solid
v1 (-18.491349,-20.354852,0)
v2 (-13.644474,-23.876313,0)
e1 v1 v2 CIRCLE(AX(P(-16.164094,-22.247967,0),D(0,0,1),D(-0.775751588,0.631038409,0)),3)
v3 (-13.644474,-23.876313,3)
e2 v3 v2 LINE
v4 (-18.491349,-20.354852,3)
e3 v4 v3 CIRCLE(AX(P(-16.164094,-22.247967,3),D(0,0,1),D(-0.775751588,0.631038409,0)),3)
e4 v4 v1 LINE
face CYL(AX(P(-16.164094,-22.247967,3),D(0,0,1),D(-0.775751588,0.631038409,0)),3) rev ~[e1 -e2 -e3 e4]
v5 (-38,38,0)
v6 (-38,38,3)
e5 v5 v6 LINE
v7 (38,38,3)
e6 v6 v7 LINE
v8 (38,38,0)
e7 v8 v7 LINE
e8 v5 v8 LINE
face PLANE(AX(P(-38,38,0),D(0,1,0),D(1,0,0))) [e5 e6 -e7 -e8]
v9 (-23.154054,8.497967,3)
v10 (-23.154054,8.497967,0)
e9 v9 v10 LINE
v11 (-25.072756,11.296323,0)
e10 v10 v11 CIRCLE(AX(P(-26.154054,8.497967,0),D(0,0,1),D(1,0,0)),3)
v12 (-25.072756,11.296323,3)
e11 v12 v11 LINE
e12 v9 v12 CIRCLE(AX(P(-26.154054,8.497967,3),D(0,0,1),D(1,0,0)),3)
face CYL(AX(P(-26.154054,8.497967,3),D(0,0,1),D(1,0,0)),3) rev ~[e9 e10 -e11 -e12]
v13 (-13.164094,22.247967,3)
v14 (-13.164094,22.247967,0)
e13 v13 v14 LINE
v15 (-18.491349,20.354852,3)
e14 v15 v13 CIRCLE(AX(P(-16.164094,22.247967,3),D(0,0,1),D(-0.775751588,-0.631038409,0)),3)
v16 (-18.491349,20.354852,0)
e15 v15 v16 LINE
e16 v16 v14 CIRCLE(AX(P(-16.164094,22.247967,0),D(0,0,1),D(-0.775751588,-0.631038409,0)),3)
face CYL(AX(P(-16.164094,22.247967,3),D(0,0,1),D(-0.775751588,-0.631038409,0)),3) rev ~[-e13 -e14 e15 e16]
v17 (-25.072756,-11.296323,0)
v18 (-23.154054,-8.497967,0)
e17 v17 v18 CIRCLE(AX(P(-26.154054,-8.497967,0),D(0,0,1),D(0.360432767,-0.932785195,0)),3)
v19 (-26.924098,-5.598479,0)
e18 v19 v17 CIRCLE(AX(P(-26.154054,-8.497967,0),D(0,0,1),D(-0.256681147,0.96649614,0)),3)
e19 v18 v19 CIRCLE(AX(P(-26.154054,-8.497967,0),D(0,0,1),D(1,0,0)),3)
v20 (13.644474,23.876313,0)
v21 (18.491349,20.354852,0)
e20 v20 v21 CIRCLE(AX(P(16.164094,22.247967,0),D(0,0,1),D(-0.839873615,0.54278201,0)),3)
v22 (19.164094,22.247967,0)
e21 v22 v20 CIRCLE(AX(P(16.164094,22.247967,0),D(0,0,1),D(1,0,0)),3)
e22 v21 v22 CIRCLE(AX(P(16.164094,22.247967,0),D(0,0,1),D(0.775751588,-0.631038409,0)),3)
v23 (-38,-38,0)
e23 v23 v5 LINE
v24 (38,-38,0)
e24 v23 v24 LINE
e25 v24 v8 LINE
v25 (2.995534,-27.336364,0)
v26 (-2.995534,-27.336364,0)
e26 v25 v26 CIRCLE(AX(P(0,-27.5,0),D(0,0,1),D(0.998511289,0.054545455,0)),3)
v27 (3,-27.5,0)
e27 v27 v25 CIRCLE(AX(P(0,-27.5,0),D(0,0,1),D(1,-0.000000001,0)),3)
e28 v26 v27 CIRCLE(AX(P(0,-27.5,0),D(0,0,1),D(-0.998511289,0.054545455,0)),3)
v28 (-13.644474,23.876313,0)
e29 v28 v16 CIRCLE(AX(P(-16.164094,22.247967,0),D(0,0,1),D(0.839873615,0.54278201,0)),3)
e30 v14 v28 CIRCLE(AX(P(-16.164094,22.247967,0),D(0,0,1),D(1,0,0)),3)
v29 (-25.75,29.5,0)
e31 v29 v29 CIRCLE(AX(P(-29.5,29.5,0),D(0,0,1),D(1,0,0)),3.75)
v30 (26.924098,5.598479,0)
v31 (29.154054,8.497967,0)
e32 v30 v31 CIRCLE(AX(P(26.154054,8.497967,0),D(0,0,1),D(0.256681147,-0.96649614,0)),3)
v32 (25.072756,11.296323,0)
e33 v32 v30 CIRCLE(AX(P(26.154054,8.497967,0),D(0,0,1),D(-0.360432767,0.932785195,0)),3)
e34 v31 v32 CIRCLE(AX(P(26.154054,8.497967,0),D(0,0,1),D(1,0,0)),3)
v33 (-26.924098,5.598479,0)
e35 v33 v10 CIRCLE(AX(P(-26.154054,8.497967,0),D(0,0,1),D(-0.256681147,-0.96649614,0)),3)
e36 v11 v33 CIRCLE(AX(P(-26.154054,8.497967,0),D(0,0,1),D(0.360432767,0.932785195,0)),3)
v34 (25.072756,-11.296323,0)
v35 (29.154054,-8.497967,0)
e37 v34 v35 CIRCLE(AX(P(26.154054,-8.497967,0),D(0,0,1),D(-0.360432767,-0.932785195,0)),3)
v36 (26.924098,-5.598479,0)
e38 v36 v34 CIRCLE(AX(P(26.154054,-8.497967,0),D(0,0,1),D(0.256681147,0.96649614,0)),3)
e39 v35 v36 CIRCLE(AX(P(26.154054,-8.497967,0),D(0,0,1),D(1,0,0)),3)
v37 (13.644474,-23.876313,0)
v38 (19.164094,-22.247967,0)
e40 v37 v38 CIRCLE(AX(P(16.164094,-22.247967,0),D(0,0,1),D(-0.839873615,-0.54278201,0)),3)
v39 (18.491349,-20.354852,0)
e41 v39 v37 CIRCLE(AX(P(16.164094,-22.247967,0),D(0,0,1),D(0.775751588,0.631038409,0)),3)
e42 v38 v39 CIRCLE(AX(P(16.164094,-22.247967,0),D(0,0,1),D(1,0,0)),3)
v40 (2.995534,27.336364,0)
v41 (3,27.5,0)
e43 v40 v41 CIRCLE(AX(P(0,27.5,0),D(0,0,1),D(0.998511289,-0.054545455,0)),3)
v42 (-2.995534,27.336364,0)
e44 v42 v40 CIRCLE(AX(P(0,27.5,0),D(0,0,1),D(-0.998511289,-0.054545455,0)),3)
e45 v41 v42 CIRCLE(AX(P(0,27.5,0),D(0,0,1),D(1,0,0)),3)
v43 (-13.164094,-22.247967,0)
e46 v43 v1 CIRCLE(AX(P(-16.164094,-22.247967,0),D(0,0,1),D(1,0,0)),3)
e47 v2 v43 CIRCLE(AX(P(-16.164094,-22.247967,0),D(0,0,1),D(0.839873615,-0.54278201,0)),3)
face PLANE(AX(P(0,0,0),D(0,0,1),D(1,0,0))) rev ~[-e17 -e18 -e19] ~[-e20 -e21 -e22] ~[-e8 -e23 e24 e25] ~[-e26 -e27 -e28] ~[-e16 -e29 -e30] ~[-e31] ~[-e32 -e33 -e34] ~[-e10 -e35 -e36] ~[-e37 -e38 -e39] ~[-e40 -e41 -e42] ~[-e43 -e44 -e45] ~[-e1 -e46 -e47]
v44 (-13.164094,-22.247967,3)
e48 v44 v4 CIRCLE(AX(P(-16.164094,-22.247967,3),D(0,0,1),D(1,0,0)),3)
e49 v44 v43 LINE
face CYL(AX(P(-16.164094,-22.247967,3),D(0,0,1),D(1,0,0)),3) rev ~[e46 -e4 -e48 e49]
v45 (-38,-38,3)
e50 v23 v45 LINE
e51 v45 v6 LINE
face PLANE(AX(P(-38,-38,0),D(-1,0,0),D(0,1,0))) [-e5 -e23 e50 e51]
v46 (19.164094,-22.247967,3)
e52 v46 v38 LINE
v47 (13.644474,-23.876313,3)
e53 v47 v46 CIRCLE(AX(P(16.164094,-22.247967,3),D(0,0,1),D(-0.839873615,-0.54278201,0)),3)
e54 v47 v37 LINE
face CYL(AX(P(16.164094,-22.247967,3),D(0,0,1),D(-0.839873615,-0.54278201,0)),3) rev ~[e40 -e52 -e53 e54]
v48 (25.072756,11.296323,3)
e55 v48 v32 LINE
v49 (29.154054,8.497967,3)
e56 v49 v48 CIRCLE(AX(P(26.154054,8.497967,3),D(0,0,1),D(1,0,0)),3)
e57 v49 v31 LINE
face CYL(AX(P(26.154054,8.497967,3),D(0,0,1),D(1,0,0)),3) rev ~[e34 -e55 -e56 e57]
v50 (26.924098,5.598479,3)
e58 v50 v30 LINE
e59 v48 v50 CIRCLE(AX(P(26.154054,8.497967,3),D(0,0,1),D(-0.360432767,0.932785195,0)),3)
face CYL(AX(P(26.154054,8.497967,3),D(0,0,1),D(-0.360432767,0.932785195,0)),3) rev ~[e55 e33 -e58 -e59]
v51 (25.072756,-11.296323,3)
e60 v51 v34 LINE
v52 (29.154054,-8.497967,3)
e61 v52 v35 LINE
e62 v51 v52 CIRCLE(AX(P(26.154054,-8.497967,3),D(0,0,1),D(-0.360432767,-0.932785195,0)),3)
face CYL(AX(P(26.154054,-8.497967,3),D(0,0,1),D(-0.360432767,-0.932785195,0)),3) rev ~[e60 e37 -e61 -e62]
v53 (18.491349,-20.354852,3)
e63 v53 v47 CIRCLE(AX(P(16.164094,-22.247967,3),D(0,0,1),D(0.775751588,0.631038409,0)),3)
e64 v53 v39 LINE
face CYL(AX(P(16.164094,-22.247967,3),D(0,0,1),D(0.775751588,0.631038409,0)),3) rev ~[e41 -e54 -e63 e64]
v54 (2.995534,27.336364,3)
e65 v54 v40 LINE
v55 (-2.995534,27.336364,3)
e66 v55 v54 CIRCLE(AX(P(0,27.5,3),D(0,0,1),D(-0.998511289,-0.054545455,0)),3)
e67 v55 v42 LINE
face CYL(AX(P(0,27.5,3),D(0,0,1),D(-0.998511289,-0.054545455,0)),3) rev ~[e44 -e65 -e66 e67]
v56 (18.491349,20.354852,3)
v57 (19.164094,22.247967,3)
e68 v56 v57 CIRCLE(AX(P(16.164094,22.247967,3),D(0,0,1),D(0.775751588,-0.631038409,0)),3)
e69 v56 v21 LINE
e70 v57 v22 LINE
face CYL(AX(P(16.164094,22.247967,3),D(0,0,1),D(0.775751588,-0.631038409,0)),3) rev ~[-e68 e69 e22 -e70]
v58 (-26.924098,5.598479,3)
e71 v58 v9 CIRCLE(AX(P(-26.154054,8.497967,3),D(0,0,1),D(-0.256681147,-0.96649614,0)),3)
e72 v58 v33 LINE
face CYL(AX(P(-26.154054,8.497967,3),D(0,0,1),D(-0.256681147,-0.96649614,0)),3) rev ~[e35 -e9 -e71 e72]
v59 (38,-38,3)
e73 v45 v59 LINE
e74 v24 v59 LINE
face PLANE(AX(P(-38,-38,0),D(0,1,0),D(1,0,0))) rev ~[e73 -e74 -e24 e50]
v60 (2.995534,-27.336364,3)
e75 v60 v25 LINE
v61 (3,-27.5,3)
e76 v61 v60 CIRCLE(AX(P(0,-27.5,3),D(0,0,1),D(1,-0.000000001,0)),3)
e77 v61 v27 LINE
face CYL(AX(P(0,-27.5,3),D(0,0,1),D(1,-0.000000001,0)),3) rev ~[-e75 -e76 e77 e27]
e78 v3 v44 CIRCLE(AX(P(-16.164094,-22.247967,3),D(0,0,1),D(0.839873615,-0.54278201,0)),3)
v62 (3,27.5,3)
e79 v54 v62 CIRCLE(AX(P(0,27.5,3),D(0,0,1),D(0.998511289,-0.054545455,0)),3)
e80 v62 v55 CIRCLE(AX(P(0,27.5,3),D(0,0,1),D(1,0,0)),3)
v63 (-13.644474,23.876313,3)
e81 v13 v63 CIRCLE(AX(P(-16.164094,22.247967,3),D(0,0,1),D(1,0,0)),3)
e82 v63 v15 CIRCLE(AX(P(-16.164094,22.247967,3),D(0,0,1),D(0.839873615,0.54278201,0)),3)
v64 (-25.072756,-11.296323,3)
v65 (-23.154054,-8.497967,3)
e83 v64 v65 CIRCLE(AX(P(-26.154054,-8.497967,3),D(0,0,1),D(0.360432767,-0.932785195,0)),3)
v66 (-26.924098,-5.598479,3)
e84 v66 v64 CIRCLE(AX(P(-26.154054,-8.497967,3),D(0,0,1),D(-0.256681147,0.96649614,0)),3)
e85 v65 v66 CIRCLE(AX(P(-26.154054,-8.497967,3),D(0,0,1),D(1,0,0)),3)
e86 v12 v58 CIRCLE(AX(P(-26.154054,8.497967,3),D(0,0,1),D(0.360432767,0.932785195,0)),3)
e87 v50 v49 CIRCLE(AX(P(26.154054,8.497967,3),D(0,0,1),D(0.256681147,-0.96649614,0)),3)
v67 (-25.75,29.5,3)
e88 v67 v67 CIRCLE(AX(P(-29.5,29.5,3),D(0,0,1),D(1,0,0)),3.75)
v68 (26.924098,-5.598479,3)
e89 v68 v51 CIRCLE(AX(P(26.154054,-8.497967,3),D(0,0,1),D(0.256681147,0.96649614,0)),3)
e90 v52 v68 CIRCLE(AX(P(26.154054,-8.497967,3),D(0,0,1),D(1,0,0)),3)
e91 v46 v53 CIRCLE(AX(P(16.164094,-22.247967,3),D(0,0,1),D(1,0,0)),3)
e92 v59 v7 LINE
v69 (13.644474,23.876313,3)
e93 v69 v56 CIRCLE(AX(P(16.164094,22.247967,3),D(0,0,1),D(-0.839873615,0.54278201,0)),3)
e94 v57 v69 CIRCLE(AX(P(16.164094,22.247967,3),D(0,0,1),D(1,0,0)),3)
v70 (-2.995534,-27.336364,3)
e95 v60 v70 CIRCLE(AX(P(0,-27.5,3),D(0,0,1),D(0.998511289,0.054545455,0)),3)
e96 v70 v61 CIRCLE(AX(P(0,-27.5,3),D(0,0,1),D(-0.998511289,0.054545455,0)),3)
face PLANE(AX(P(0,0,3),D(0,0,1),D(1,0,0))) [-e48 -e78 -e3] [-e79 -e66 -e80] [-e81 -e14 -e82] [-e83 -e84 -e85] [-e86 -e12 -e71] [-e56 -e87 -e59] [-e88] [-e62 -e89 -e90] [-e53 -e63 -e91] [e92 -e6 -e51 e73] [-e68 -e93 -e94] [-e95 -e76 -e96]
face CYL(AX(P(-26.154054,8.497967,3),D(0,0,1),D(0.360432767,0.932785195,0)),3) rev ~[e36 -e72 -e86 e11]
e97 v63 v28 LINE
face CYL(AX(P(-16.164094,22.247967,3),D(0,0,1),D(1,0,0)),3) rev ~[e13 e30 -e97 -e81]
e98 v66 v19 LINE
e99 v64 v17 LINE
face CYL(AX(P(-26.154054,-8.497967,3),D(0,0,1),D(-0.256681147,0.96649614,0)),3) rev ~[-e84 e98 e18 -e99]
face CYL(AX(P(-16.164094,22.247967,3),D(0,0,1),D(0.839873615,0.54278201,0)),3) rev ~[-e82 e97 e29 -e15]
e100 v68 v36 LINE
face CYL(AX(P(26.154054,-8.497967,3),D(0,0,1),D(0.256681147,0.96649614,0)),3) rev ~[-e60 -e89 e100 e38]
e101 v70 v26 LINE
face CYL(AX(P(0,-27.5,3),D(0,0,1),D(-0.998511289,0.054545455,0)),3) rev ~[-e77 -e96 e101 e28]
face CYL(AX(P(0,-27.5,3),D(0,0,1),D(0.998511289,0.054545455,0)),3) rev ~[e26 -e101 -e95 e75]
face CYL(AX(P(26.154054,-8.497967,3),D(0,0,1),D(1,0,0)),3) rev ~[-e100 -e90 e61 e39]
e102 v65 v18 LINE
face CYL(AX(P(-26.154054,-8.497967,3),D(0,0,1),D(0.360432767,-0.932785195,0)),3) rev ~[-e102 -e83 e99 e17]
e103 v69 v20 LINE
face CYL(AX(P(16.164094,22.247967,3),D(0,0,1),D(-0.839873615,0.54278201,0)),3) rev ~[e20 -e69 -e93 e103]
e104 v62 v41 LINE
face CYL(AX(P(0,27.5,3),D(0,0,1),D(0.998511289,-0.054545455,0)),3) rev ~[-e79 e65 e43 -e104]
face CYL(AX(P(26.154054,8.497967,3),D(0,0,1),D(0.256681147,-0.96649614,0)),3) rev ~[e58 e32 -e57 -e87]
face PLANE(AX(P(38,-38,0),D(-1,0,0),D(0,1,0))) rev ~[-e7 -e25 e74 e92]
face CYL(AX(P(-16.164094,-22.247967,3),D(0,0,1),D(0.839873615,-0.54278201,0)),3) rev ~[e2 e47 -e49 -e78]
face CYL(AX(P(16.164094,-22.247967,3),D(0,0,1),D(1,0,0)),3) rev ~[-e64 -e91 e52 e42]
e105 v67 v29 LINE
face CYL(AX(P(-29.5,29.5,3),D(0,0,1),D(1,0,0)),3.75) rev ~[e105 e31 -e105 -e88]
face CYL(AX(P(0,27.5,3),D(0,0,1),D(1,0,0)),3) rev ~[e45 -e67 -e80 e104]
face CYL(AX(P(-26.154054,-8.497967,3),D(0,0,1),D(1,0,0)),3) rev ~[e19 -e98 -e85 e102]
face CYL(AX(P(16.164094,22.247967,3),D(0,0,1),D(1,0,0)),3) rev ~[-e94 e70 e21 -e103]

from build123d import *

# Parameters (mm, degrees)
F0_W     = 76
F0_H     = 76
F1_DEPTH = 3
F3_DEPTH = 25
F4_R     = 3.75
F5_DEPTH = 25


with BuildPart() as f1:
    # F0 (on Top) → F1 (new body)
    with BuildSketch(Plane.XY):
        Rectangle(F0_W, F0_H)
    extrude(amount=F1_DEPTH)

    # F2 (on face) → F3 (cut)
    with BuildSketch(Plane.XY.offset(3)):
        with BuildLine():
            ThreePointArc((25.0727558965, 11.2963229308), (23.3008846492, 7.5709163622), (26.9240976399, 5.5984789253))
            ThreePointArc((26.9240976399, 5.5984789253), (26.1540541981, 8.4979673453), (25.0727558965, 11.2963229308))
        make_face()
        with BuildLine():
            ThreePointArc((25.0727558965, 11.2963229308), (26.1540541981, 8.4979673453), (26.9240976399, 5.5984789253))
            ThreePointArc((26.9240976399, 5.5984789253), (28.5320922892, 6.669051044), (29.1540541981, 8.4979673453))
            ThreePointArc((29.1540541981, 8.4979673453), (27.8505366022, 10.9722242949), (25.0727558965, 11.2963229308))
        make_face()
        with BuildLine():
            ThreePointArc((29.1540541981, -8.4979673453), (28.5320922892, -6.669051044), (26.9240976399, -5.5984789253))
            ThreePointArc((26.9240976399, -5.5984789253), (26.1540541981, -8.4979673453), (25.0727558965, -11.2963229308))
            ThreePointArc((25.0727558965, -11.2963229308), (27.8505366022, -10.9722242949), (29.1540541981, -8.4979673453))
        make_face()
        with BuildLine():
            ThreePointArc((25.0727558965, -11.2963229308), (26.1540541981, -8.4979673453), (26.9240976399, -5.5984789253))
            ThreePointArc((26.9240976399, -5.5984789253), (23.3008846492, -7.5709163622), (25.0727558965, -11.2963229308))
        make_face()
        with BuildLine():
            ThreePointArc((13.6444735922, 23.8763133752), (14.4007386812, 19.8209163622), (18.4913492013, 20.3548521172))
            ThreePointArc((18.4913492013, 20.3548521172), (16.164094438, 22.2479673453), (13.6444735922, 23.8763133752))
        make_face()
        with BuildLine():
            ThreePointArc((13.6444735922, 23.8763133752), (16.164094438, 22.2479673453), (18.4913492013, 20.3548521172))
            ThreePointArc((18.4913492013, 20.3548521172), (18.990909279, 21.2434187626), (19.164094438, 22.2479673453))
            ThreePointArc((19.164094438, 22.2479673453), (17.0129576374, 25.1253674337), (13.6444735922, 23.8763133752))
        make_face()
        with BuildLine():
            ThreePointArc((19.164094438, -22.2479673453), (18.990909279, -21.2434187626), (18.4913492013, -20.3548521172))
            ThreePointArc((18.4913492013, -20.3548521172), (16.164094438, -22.2479673453), (13.6444735922, -23.8763133752))
            ThreePointArc((13.6444735922, -23.8763133752), (17.0129576374, -25.1253674337), (19.164094438, -22.2479673453))
        make_face()
        with BuildLine():
            ThreePointArc((13.6444735922, -23.8763133752), (16.164094438, -22.2479673453), (18.4913492013, -20.3548521172))
            ThreePointArc((18.4913492013, -20.3548521172), (14.4007386812, -19.8209163622), (13.6444735922, -23.8763133752))
        make_face()
        with BuildLine():
            ThreePointArc((-2.9955338657, 27.3363636364), (0, 24.5), (2.9955338657, 27.3363636364))
            ThreePointArc((2.9955338657, 27.3363636364), (0, 27.5), (-2.9955338657, 27.3363636364))
        make_face()
        with BuildLine():
            ThreePointArc((-2.9955338657, 27.3363636364), (0, 27.5), (2.9955338657, 27.3363636364))
            ThreePointArc((2.9955338657, 27.3363636364), (2.9988832586, 27.4181513503), (3, 27.5))
            ThreePointArc((3, 27.5), (-0.0818486497, 30.4988832586), (-2.9955338657, 27.3363636364))
        make_face()
        with BuildLine():
            ThreePointArc((3, -27.5), (2.9988832586, -27.4181513503), (2.9955338657, -27.3363636364))
            ThreePointArc((2.9955338657, -27.3363636364), (0, -27.5), (-2.9955338657, -27.3363636364))
            ThreePointArc((-2.9955338657, -27.3363636364), (-0.0818486497, -30.4988832586), (3, -27.5))
        make_face()
        with BuildLine():
            ThreePointArc((-2.9955338657, -27.3363636364), (0, -27.5), (2.9955338657, -27.3363636364))
            ThreePointArc((2.9955338657, -27.3363636364), (0, -24.5), (-2.9955338657, -27.3363636364))
        make_face()
        with BuildLine():
            ThreePointArc((-13.164094438, 22.2479673453), (-13.2866943496, 23.0968305447), (-13.6444735922, 23.8763133752))
            ThreePointArc((-13.6444735922, 23.8763133752), (-16.164094438, 22.2479673453), (-18.4913492013, 20.3548521172))
            ThreePointArc((-18.4913492013, 20.3548521172), (-15.1595458553, 19.4211525044), (-13.164094438, 22.2479673453))
        make_face()
        with BuildLine():
            ThreePointArc((-18.4913492013, 20.3548521172), (-16.164094438, 22.2479673453), (-13.6444735922, 23.8763133752))
            ThreePointArc((-13.6444735922, 23.8763133752), (-17.9274501949, 24.6750183284), (-18.4913492013, 20.3548521172))
        make_face()
        with BuildLine():
            ThreePointArc((-18.4913492013, -20.3548521172), (-17.9274501949, -24.6750183284), (-13.6444735922, -23.8763133752))
            ThreePointArc((-13.6444735922, -23.8763133752), (-16.164094438, -22.2479673453), (-18.4913492013, -20.3548521172))
        make_face()
        with BuildLine():
            ThreePointArc((-18.4913492013, -20.3548521172), (-16.164094438, -22.2479673453), (-13.6444735922, -23.8763133752))
            ThreePointArc((-13.6444735922, -23.8763133752), (-13.2866943496, -23.0968305447), (-13.164094438, -22.2479673453))
            ThreePointArc((-13.164094438, -22.2479673453), (-15.1595458553, -19.4211525044), (-18.4913492013, -20.3548521172))
        make_face()
        with BuildLine():
            ThreePointArc((-23.1540541981, 8.4979673453), (-23.6797972485, 10.1944497494), (-25.0727558965, 11.2963229308))
            ThreePointArc((-25.0727558965, 11.2963229308), (-26.1540541981, 8.4979673453), (-26.9240976399, 5.5984789253))
            ThreePointArc((-26.9240976399, 5.5984789253), (-24.3251378968, 6.1199292542), (-23.1540541981, 8.4979673453))
        make_face()
        with BuildLine():
            ThreePointArc((-26.9240976399, 5.5984789253), (-26.1540541981, 8.4979673453), (-25.0727558965, 11.2963229308))
            ThreePointArc((-25.0727558965, 11.2963229308), (-29.007223747, 9.4250183284), (-26.9240976399, 5.5984789253))
        make_face()
        with BuildLine():
            ThreePointArc((-26.9240976399, -5.5984789253), (-29.007223747, -9.4250183284), (-25.0727558965, -11.2963229308))
            ThreePointArc((-25.0727558965, -11.2963229308), (-26.1540541981, -8.4979673453), (-26.9240976399, -5.5984789253))
        make_face()
        with BuildLine():
            ThreePointArc((-26.9240976399, -5.5984789253), (-26.1540541981, -8.4979673453), (-25.0727558965, -11.2963229308))
            ThreePointArc((-25.0727558965, -11.2963229308), (-23.6797972485, -10.1944497494), (-23.1540541981, -8.4979673453))
            ThreePointArc((-23.1540541981, -8.4979673453), (-24.3251378968, -6.1199292542), (-26.9240976399, -5.5984789253))
        make_face()
    extrude(amount=-F3_DEPTH, mode=Mode.SUBTRACT)

    # F4 (on face) → F5 (cut)
    with BuildSketch(Plane.XY.offset(3)):
        with Locations((-29.5, 29.5)):
            Circle(F4_R)
    extrude(amount=-F5_DEPTH, mode=Mode.SUBTRACT)


solid = f1.part
